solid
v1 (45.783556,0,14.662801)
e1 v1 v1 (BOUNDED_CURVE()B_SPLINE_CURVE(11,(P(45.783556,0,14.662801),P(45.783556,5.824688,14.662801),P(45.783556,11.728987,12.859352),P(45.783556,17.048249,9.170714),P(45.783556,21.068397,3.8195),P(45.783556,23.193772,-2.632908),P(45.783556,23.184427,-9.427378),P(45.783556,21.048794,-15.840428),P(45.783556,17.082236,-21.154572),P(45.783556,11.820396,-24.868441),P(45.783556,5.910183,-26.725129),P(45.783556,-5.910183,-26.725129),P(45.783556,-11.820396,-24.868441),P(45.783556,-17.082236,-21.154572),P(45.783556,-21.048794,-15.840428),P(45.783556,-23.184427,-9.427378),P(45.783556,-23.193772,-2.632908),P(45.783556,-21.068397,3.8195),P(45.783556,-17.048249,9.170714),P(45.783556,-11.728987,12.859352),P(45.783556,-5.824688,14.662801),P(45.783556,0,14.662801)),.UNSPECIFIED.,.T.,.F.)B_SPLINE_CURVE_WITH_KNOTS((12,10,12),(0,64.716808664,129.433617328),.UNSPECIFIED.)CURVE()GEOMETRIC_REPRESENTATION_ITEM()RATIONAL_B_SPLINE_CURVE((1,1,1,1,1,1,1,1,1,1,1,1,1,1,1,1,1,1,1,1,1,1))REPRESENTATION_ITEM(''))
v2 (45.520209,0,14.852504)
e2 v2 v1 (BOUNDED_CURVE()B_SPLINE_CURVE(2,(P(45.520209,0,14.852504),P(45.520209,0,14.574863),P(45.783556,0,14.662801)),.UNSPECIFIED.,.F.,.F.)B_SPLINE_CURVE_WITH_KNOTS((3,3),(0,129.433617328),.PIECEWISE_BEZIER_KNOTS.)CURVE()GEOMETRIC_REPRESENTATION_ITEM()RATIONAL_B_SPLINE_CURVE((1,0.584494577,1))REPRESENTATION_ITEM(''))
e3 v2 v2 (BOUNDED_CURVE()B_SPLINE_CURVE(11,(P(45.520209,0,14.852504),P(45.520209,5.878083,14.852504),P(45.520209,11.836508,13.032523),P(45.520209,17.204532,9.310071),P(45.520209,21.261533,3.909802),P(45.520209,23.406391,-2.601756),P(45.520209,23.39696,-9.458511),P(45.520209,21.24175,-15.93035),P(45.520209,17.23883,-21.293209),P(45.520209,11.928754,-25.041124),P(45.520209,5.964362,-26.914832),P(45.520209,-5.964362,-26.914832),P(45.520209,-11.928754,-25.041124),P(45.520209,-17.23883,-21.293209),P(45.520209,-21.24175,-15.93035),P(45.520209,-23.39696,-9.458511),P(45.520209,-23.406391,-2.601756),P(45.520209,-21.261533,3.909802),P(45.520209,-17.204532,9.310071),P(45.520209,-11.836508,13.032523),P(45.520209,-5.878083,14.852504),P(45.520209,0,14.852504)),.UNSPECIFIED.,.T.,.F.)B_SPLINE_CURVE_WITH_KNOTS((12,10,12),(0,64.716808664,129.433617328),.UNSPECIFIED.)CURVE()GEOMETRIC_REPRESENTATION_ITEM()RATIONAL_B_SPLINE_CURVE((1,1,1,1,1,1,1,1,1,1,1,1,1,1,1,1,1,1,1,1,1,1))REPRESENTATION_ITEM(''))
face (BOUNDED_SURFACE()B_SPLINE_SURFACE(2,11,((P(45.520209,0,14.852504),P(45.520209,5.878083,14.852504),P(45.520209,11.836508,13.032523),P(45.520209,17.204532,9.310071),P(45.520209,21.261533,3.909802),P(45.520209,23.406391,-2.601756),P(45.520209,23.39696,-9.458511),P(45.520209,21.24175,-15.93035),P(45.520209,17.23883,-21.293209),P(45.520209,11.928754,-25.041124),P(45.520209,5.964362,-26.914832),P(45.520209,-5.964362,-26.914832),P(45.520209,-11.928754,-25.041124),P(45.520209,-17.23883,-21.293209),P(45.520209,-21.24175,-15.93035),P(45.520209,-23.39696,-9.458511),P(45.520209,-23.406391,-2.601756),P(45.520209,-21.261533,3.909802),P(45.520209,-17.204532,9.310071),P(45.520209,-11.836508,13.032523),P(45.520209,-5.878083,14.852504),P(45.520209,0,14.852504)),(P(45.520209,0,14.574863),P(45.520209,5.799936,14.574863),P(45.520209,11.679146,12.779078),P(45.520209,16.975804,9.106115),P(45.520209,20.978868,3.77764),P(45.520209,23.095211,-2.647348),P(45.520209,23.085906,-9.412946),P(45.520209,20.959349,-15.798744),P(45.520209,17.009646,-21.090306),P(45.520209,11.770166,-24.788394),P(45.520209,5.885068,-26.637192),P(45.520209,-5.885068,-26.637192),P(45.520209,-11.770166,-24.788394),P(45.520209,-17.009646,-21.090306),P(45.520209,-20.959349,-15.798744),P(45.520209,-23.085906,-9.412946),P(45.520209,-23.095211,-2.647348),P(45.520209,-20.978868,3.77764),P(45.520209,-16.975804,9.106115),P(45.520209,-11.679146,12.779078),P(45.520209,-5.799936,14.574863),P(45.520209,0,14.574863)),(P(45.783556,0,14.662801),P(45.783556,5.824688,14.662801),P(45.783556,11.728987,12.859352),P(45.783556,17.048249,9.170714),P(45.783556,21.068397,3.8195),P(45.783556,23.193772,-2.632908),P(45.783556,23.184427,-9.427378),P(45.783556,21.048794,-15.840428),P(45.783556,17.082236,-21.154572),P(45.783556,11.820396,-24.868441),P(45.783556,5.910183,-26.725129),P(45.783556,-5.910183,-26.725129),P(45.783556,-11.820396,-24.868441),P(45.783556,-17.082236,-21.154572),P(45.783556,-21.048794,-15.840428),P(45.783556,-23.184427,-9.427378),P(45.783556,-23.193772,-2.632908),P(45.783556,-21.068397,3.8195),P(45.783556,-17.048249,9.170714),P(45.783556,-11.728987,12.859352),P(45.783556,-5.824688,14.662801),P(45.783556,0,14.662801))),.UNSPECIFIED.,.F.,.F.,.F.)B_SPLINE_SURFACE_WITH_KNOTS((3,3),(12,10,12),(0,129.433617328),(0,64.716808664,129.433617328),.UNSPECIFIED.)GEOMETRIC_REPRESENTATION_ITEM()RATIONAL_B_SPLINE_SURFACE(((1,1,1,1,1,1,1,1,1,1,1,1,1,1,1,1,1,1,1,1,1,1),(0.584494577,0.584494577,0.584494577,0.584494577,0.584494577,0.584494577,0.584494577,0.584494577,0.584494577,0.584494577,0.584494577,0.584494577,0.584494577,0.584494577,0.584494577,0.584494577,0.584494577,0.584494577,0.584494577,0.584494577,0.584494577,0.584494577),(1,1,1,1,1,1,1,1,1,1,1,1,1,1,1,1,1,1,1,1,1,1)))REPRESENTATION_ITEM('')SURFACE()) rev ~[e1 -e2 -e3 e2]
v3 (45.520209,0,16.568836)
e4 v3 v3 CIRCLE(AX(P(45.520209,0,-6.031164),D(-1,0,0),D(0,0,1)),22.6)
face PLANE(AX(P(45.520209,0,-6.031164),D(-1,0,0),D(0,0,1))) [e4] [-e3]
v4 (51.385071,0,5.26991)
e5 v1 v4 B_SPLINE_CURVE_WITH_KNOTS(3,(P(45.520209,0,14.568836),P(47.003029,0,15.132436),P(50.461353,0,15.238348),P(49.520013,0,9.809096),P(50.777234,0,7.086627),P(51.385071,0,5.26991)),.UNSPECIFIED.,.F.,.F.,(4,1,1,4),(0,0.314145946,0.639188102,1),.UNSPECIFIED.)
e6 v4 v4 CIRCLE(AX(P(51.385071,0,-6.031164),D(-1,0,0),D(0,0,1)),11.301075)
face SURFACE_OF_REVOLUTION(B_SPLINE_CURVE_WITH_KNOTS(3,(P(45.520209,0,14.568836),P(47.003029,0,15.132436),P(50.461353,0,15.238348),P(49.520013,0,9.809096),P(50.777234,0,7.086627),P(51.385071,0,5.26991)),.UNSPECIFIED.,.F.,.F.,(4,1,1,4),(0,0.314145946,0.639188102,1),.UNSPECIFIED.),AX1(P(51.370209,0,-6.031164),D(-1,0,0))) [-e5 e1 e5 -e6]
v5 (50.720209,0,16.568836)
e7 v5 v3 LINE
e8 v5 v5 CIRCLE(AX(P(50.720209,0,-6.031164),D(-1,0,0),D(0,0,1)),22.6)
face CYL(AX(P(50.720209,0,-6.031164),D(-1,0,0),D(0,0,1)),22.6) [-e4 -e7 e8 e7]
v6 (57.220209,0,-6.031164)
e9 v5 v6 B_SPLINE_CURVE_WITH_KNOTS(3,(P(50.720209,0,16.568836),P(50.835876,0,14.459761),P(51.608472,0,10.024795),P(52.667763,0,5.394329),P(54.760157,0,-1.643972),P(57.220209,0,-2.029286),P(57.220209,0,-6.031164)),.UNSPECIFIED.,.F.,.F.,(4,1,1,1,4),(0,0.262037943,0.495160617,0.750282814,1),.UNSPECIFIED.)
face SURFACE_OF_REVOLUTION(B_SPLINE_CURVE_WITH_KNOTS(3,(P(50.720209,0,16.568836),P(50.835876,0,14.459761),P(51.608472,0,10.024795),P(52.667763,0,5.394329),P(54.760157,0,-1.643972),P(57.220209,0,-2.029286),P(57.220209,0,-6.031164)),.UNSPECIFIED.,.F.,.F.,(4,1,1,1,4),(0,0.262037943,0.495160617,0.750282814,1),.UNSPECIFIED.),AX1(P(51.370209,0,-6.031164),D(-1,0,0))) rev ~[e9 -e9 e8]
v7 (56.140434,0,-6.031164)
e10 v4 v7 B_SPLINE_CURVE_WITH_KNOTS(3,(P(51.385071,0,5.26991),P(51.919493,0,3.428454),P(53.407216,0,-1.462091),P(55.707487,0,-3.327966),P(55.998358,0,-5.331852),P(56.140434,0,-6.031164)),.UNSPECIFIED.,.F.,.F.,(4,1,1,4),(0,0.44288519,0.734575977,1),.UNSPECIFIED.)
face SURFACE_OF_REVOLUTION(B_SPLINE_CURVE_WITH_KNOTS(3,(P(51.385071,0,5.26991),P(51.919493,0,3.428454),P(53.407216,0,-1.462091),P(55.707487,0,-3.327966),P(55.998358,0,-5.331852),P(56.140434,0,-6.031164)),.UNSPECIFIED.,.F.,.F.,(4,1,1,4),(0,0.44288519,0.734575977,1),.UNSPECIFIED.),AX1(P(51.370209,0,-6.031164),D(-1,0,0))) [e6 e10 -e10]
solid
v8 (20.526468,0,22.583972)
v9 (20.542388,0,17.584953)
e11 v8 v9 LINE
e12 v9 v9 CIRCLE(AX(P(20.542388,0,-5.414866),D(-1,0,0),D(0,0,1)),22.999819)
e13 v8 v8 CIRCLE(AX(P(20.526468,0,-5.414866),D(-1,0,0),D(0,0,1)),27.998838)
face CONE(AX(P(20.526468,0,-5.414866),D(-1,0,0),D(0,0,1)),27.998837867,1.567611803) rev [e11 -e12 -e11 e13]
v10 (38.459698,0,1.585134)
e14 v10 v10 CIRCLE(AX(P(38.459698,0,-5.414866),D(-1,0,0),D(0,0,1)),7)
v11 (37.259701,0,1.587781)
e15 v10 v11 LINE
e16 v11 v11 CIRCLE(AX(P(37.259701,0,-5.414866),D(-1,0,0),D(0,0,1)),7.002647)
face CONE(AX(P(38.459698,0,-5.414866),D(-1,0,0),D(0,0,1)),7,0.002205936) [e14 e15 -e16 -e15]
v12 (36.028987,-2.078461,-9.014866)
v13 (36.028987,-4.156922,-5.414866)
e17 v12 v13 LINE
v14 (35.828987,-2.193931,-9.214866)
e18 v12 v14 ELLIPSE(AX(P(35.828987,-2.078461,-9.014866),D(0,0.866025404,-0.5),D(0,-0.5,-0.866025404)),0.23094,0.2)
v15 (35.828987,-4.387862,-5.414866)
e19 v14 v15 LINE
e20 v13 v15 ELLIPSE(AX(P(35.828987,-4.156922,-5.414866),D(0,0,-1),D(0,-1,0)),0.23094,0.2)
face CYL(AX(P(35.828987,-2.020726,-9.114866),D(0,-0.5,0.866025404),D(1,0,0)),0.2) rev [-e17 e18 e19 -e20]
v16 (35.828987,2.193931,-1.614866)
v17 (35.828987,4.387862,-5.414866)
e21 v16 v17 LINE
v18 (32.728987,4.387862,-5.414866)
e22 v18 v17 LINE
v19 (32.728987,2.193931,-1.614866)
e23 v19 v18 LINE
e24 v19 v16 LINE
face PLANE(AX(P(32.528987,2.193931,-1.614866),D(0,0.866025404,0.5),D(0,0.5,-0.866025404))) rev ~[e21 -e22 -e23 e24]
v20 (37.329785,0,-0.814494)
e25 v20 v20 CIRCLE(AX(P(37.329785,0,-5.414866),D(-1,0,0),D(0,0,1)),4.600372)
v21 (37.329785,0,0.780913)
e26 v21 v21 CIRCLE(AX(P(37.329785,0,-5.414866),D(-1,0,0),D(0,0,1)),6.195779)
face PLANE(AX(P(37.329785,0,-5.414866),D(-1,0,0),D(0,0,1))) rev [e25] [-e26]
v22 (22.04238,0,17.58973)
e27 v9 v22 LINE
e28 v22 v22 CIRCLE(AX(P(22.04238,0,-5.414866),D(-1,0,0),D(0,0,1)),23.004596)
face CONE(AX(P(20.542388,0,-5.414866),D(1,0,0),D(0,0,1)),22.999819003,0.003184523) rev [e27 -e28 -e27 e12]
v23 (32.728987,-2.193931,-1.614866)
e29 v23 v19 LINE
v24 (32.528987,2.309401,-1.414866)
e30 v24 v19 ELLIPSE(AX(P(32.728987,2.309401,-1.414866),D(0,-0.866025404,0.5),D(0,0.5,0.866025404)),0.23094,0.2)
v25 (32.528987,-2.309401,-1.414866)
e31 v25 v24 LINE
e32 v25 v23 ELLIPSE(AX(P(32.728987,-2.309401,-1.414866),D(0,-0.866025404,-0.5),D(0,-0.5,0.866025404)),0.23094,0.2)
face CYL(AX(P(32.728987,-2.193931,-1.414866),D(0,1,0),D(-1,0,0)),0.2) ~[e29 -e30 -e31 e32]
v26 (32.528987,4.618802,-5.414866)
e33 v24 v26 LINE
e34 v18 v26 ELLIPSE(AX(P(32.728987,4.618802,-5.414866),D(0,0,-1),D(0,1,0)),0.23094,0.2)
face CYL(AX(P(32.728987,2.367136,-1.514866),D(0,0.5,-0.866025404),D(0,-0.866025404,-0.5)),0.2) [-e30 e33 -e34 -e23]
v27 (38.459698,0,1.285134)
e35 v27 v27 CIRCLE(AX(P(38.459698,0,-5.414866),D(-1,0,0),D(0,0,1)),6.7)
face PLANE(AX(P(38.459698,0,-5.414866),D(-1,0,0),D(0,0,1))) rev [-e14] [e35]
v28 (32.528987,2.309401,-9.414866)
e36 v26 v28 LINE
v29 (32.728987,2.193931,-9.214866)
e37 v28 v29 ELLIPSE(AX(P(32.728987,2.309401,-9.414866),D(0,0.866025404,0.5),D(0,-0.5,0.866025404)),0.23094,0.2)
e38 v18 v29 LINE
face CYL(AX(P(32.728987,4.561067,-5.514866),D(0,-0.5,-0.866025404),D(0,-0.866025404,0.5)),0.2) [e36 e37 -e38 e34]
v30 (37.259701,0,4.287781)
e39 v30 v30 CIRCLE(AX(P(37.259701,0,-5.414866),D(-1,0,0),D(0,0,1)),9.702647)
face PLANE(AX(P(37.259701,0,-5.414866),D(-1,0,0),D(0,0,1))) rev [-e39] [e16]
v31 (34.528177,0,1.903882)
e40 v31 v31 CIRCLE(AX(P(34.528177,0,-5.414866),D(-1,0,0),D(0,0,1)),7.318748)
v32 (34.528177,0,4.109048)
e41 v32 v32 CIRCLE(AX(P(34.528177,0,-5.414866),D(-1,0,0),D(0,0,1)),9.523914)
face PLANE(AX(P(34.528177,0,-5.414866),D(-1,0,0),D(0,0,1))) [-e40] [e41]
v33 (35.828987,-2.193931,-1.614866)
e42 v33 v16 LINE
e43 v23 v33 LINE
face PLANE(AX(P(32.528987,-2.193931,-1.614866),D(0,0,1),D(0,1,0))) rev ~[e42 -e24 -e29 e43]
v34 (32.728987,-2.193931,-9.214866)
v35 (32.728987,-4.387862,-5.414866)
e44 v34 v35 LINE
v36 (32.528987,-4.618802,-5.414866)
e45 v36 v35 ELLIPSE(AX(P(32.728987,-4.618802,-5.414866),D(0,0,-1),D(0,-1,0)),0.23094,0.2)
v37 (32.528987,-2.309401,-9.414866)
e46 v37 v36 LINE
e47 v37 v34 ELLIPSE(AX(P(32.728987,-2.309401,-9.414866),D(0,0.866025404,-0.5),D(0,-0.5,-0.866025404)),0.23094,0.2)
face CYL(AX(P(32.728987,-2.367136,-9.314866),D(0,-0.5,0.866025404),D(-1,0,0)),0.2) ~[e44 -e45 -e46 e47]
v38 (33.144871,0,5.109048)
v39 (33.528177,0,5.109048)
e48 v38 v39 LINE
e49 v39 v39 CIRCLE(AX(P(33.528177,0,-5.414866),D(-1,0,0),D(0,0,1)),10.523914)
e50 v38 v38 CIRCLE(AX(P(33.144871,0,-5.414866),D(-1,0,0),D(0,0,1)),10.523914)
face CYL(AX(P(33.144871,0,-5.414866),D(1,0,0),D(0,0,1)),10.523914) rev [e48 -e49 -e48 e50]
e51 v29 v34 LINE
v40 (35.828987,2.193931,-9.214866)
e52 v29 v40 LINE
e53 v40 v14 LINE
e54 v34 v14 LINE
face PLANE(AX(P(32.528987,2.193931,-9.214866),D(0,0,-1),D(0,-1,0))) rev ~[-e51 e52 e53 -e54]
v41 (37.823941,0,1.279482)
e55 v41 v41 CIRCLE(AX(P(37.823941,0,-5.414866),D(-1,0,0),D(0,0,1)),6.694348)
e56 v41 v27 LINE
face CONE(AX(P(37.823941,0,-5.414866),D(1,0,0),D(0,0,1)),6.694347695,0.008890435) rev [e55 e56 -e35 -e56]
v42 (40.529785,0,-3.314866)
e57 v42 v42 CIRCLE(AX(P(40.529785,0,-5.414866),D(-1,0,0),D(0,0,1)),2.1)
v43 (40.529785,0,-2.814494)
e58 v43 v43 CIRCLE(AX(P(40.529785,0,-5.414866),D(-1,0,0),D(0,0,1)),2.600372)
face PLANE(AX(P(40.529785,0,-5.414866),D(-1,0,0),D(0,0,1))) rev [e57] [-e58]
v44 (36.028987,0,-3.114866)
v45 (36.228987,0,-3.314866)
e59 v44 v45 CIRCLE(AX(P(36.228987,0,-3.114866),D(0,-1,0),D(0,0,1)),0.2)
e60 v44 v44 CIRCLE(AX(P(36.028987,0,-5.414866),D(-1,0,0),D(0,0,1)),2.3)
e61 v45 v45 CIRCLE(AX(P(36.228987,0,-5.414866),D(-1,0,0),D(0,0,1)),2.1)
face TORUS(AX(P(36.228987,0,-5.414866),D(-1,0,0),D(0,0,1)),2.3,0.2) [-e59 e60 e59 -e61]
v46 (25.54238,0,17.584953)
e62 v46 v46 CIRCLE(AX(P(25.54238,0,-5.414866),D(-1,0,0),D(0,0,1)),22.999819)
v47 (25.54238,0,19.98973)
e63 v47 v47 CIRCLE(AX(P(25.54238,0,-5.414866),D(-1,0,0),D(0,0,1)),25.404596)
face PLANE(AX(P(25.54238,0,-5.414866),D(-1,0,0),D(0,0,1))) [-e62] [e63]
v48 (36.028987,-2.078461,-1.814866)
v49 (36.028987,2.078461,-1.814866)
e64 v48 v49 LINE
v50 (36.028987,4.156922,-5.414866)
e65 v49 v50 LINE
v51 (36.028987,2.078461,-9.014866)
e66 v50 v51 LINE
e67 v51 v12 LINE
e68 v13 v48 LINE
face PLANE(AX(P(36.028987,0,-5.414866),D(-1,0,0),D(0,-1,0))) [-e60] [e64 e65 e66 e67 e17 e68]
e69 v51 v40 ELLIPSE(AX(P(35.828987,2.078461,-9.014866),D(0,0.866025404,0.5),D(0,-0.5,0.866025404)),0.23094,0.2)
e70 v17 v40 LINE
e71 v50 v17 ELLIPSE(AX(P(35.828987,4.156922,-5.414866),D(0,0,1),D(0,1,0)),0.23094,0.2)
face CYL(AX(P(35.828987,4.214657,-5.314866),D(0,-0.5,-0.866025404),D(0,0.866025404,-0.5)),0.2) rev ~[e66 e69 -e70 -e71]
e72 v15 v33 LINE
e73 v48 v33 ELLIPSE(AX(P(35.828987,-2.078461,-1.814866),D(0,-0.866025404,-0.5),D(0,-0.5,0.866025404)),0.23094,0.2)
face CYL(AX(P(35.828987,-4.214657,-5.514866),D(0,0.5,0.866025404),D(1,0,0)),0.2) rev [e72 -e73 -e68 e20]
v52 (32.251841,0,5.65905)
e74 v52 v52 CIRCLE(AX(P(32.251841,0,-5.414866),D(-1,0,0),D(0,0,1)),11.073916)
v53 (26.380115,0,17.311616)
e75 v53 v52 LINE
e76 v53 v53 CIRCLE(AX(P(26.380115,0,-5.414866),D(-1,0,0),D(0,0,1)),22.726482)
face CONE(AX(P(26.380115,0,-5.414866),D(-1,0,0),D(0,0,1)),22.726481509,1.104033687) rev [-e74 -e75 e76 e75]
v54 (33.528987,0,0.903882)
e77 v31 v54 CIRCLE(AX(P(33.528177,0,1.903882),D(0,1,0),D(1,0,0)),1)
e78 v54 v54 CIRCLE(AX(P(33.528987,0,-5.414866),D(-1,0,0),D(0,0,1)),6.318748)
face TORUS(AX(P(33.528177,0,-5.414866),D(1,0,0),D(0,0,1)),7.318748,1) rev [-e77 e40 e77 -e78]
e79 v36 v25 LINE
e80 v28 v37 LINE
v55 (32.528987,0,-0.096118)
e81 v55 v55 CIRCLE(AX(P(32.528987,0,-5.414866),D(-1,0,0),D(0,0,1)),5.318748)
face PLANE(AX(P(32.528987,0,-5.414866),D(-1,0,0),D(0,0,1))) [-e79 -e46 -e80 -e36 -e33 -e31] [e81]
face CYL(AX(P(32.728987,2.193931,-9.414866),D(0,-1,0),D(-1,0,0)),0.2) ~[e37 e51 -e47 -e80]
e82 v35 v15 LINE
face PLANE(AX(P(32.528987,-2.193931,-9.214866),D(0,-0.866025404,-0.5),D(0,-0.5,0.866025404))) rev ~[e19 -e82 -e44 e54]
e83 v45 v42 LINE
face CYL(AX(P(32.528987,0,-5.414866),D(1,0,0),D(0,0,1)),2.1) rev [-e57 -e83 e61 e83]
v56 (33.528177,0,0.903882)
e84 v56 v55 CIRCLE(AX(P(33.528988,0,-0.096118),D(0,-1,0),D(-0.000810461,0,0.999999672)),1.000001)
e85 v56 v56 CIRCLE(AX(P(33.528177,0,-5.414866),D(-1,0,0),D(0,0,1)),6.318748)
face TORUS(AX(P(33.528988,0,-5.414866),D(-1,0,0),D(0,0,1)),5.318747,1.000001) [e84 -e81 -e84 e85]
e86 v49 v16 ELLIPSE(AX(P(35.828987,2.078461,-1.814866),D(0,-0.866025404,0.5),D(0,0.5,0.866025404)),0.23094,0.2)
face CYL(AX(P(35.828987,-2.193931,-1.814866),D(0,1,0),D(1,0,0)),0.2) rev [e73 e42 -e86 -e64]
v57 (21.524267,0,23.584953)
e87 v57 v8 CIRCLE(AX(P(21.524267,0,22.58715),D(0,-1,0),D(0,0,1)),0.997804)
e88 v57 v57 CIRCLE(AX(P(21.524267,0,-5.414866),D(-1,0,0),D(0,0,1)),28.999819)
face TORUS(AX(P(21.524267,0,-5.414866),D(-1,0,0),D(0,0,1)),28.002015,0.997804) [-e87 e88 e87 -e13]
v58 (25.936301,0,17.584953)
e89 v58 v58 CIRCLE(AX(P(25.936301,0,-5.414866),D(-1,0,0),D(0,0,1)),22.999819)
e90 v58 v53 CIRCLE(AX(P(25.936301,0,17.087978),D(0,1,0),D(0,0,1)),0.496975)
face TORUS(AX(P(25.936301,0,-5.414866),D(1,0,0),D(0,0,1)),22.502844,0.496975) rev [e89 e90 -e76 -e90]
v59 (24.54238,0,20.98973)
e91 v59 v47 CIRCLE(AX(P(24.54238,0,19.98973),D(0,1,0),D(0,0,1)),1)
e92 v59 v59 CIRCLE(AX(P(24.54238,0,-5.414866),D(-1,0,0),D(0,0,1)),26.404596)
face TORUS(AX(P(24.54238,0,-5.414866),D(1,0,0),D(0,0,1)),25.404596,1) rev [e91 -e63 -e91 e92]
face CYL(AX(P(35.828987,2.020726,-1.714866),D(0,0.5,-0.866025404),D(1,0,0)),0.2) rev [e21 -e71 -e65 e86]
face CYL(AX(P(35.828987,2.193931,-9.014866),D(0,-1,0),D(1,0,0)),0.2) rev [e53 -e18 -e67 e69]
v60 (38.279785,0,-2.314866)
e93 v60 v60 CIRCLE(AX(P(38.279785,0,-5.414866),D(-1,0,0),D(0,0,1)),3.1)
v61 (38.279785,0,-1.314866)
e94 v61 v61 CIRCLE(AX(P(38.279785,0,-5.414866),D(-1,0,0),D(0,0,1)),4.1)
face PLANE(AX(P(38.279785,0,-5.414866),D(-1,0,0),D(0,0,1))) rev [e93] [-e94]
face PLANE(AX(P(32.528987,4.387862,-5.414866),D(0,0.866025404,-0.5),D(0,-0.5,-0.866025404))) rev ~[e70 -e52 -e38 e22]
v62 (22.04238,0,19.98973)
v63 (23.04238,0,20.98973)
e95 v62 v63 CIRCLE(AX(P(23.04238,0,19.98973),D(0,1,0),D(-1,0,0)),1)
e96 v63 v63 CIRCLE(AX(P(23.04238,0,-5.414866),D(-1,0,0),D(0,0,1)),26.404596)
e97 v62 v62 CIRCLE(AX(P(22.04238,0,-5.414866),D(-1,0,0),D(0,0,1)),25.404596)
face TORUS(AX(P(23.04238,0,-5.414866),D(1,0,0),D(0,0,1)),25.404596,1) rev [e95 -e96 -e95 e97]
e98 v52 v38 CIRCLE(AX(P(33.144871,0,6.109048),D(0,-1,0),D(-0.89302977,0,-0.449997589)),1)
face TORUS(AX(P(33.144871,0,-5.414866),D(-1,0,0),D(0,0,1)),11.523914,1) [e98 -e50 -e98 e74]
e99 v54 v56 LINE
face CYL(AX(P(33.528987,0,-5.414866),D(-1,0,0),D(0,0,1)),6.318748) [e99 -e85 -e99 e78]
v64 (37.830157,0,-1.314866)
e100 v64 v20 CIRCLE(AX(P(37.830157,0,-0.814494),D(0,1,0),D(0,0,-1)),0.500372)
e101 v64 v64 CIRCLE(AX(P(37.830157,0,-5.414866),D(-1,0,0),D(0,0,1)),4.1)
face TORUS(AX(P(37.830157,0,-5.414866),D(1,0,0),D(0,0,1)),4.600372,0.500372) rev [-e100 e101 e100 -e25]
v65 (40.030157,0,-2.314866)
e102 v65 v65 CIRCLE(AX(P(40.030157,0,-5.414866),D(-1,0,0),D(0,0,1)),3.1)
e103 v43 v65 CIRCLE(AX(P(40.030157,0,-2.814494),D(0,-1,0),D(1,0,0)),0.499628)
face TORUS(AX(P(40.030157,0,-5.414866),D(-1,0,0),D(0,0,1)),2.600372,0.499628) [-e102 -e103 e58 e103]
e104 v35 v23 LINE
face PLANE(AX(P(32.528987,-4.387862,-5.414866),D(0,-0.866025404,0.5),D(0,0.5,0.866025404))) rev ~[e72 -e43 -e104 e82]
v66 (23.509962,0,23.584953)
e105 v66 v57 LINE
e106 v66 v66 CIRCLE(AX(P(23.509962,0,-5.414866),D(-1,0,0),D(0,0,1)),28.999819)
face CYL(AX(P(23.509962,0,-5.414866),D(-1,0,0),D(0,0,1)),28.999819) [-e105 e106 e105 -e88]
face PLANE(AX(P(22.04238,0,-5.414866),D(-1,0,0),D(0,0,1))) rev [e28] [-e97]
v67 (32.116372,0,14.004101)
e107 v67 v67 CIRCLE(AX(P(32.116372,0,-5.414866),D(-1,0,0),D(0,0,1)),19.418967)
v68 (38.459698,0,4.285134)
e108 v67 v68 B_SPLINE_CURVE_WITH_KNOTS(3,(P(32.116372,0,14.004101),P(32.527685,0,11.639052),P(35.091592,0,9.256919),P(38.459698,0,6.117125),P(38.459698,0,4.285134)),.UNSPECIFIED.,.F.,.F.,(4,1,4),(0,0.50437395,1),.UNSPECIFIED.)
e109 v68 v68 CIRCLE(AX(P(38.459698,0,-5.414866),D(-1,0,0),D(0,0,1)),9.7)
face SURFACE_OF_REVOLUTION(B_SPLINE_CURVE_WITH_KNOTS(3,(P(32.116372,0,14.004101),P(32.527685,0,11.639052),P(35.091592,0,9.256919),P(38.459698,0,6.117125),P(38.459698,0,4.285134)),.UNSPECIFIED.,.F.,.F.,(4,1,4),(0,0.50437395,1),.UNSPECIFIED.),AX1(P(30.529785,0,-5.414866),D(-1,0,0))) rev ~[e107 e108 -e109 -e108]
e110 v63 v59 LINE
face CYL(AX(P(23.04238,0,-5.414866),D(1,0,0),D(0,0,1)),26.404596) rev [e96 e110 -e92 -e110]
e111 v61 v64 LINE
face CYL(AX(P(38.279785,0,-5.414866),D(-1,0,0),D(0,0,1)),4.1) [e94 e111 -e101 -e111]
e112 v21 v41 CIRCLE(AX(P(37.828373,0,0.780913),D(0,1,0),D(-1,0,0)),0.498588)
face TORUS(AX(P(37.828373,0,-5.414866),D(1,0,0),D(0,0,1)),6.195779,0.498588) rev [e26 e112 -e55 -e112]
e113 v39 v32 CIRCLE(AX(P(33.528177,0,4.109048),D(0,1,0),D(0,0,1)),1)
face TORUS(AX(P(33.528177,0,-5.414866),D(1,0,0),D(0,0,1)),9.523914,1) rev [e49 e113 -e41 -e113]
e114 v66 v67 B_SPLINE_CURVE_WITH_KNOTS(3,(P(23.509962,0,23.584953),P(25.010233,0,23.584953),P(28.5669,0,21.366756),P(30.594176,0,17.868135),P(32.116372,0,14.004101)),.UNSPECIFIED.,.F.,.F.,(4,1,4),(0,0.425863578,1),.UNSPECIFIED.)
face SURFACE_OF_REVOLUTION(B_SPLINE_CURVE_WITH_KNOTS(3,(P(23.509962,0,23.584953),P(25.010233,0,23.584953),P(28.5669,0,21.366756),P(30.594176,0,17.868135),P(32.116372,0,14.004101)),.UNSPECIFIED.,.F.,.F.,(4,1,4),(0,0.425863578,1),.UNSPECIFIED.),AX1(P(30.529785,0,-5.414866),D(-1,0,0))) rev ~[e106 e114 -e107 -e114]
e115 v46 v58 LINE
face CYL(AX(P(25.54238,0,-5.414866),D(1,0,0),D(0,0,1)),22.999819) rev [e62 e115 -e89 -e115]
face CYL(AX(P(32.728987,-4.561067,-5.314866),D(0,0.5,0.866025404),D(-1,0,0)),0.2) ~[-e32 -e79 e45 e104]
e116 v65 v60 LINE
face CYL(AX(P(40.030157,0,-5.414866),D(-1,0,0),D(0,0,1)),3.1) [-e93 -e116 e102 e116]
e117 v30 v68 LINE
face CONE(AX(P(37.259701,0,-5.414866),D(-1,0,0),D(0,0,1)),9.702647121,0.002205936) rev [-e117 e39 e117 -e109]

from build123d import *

# Parameters (mm, degrees)
F4_R     = 2.1
F5_DEPTH = 3.5
F6_R     = 0.2
F7_R     = 0.2
F8_R     = 0.2


# Not quite as in the source:
# - ends of sketch curves that miss each other by under 0.0002 mm in the source are joined


with BuildPart() as f2:
    # F1 (on Front) → F2 (revolve)
    with BuildSketch(Plane.XZ):
        with BuildLine():
            Line((45.5202093899, 16.5688355967), (45.5202093899, 14.5688355967))
            add(Edge.make_bspline(
                [(45.5202093899, 14.5688355967), (47.0030293557, 15.1324356496), (50.4613529685, 15.2383481596), (49.5200126524, 9.8090960667), (50.7772336715, 7.0866265215), (51.3850711286, 5.2699102089)],
                knots=[0, 0, 0, 0, 0.3141459464, 0.6391881019, 1, 1, 1, 1], degree=3))
            add(Edge.make_bspline(
                [(51.3850711286, 5.2699102089), (51.9194927912, 3.4284537262), (53.407216137, -1.4620910675), (55.7074866053, -3.3279656709), (55.9983577552, -5.3318521758), (56.1404339969, -6.0311644033)],
                knots=[0, 0, 0, 0, 0.44288519, 0.7345759766, 1, 1, 1, 1], degree=3))
            Line((56.1404339969, -6.0311644033), (57.2202093899, -6.0311644033))
            add(Edge.make_bspline(
                [(50.7202093899, 16.5688355967), (50.8358756015, 14.4597607889), (51.6084715421, 10.0247948502), (52.6677632468, 5.3943286242), (54.7601573389, -1.6439715105), (57.2202093899, -2.029285999), (57.2202093899, -6.0311644033)],
                knots=[0, 0, 0, 0, 0.2620379435, 0.4951606169, 0.7502828141, 1, 1, 1, 1], degree=3))
            Line((50.7202093899, 16.5688355967), (45.5202093899, 16.5688355967))
        make_face()
    revolve(axis=Axis((51.3702093899, 0, -6.0311644033), (-1, 0, 0)))

    # F8
    f8_edges = [f2.edges().sort_by_distance(p)[0] for p in [
        (45.520209, 0, -26.631164),
    ]]
    fillet(f8_edges, radius=F8_R)


with BuildPart() as f3:
    # F0 (on Front) → F3 (revolve)
    with BuildSketch(Plane.XZ):
        with BuildLine():
            Line((36.0301565851, -3.3148658602), (40.5297849349, -3.3148658602))
            Line((40.5297849349, -3.3148658602), (40.5297849349, -2.8144942175))
            ThreePointArc((40.5297849349, -2.8144942175), (40.3834471793, -2.4612036233), (40.0301565851, -2.3148658677))
            Line((40.0301565851, -2.3148658677), (38.2797849349, -2.3148658677))
            Line((38.2797849349, -2.3148658677), (38.2797849349, -1.3148658677))
            Line((38.2797849349, -1.3148658677), (37.8301565851, -1.3148658677))
            ThreePointArc((37.8301565851, -1.3148658677), (37.4763403981, -1.1683104045), (37.3297849349, -0.8144942175))
            Line((37.3297849349, -0.8144942175), (37.3297849349, 0.7809131756))
            ThreePointArc((37.3297849349, 0.7809131756), (37.4742543893, 1.1318977259), (37.8239406894, 1.2794818352))
            Line((37.8239406894, 1.2794818352), (38.4596976111, 1.2851341398))
            Line((38.4596976111, 1.2851341398), (38.4596976111, 1.5851341398))
            Line((38.4596976111, 1.5851341398), (37.2597005307, 1.5877812608))
            Line((37.2597005307, 1.5877812608), (37.2597005307, 4.2877812608))
            Line((37.2597005307, 4.2877812608), (38.4596976111, 4.2851341398))
            add(Edge.make_bspline(
                [(32.1163717198, 14.0041006522), (32.5276845382, 11.6390519459), (35.0915915632, 9.2569192194), (38.4596976111, 6.1171249245), (38.4596976111, 4.2851341398)],
                knots=[0, 0, 0, 0, 0.5043739502, 1, 1, 1, 1], degree=3))
            add(Edge.make_bspline(
                [(23.5099623779, 23.5849531425), (25.0102331097, 23.5849531425), (28.5668995583, 21.3667561799), (30.5941764358, 17.8681345529), (32.1163717198, 14.0041006522)],
                knots=[0, 0, 0, 0, 0.4258635783, 1, 1, 1, 1], degree=3))
            Line((23.5099623779, 23.5849531425), (21.5242667176, 23.5849531425))
            ThreePointArc((21.5242667176, 23.5849531425), (20.8175904861, 23.2915789108), (20.5264681652, 22.5839720071))
            Line((20.5264681652, 22.5839720071), (20.5423877116, 17.5849531425))
            Line((20.5423877116, 17.5849531425), (22.0423801057, 17.5897299195))
            Line((22.0423801057, 17.5897299195), (22.0423801057, 19.9897299195))
            ThreePointArc((22.0423801057, 19.9897299195), (22.3352733245, 20.6968367007), (23.0423801057, 20.9897299195))
            Line((23.0423801057, 20.9897299195), (24.5423801057, 20.9897299195))
            ThreePointArc((24.5423801057, 20.9897299195), (25.2494868869, 20.6968367007), (25.5423801057, 19.9897299195))
            Line((25.5423801057, 19.9897299195), (25.5423801057, 17.5849531425))
            Line((25.5423801057, 17.5849531425), (25.9363012909, 17.5849531425))
            ThreePointArc((25.9363012909, 17.5849531425), (26.196917794, 17.5111367429), (26.3801148345, 17.311615649))
            Line((26.3801148345, 17.311615649), (32.2518409864, 5.6590504444))
            ThreePointArc((32.2518409864, 5.6590504444), (32.6204651827, 5.2575794233), (33.144870756, 5.1090480338))
            Line((33.144870756, 5.1090480338), (33.5281772316, 5.1090480338))
            ThreePointArc((33.5281772316, 5.1090480338), (34.2352840127, 4.816154815), (34.5281772316, 4.1090480338))
            Line((34.5281772316, 4.1090480338), (34.5281772316, 1.903881737))
            ThreePointArc((34.5281772316, 1.903881737), (34.2355702979, 1.1970613569), (33.5289871321, 0.903882065))
            Line((33.5289871321, 0.903882065), (33.5281772316, 0.903881737))
            ThreePointArc((33.5281772316, 0.903881737), (32.8215940661, 0.6107021171), (32.5289871324, -0.096118263))
            Line((32.5289871324, -0.096118263), (32.5289871324, -0.5692796412))
            Line((32.5289871324, -0.5692796412), (32.5289871324, -0.7692796412))
            Line((32.5289871324, -0.7692796412), (32.5289871324, -3.3148658602))
            Line((32.5289871324, -3.3148658602), (36.0301565851, -3.3148658602))
        make_face()
    revolve(axis=Axis((30.5297849349, 0, -5.4148658602), (-1, 0, 0)))

    # F4 (on face) → F5 (cut)
    with BuildSketch(Plane(origin=(32.5289871324, 0, 0), x_dir=(0, -1, 0), z_dir=(-1, 0, 0))):
        Polygon((-2.1939310229, -9.2148658602), (2.1939310229, -9.2148658602), (4.3878620458, -5.4148658602), (2.1939310229, -1.6148658602), (-2.1939310229, -1.6148658602), (-4.3878620458, -5.4148658602), align=None)
        with Locations((0, -5.4148658602)):
            Circle(F4_R, mode=Mode.SUBTRACT)
    extrude(amount=-F5_DEPTH, mode=Mode.SUBTRACT)

    # F6
    f6_edges = [f3.edges().sort_by_distance(p)[0] for p in [
        (36.028987, 0, -9.214866),
        (36.028987, -3.290897, -7.314866),
        (36.028987, -3.290897, -3.514866),
        (36.028987, 0, -1.614866),
        (36.028987, 3.290897, -3.514866),
        (36.028987, 3.290897, -7.314866),
        (36.028987, 0, -7.514866),
    ]]
    fillet(f6_edges, radius=F6_R)

    # F7
    f7_edges = [f3.edges().sort_by_distance(p)[0] for p in [
        (32.528987, 0, -10.733613),
        (32.528987, 0, -9.214866),
        (32.528987, -3.290897, -7.314866),
        (32.528987, -3.290897, -3.514866),
        (32.528987, 0, -1.614866),
        (32.528987, 3.290897, -3.514866),
        (32.528987, 3.290897, -7.314866),
    ]]
    fillet(f7_edges, radius=F7_R)


solid = Compound([f2.part, f3.part])
